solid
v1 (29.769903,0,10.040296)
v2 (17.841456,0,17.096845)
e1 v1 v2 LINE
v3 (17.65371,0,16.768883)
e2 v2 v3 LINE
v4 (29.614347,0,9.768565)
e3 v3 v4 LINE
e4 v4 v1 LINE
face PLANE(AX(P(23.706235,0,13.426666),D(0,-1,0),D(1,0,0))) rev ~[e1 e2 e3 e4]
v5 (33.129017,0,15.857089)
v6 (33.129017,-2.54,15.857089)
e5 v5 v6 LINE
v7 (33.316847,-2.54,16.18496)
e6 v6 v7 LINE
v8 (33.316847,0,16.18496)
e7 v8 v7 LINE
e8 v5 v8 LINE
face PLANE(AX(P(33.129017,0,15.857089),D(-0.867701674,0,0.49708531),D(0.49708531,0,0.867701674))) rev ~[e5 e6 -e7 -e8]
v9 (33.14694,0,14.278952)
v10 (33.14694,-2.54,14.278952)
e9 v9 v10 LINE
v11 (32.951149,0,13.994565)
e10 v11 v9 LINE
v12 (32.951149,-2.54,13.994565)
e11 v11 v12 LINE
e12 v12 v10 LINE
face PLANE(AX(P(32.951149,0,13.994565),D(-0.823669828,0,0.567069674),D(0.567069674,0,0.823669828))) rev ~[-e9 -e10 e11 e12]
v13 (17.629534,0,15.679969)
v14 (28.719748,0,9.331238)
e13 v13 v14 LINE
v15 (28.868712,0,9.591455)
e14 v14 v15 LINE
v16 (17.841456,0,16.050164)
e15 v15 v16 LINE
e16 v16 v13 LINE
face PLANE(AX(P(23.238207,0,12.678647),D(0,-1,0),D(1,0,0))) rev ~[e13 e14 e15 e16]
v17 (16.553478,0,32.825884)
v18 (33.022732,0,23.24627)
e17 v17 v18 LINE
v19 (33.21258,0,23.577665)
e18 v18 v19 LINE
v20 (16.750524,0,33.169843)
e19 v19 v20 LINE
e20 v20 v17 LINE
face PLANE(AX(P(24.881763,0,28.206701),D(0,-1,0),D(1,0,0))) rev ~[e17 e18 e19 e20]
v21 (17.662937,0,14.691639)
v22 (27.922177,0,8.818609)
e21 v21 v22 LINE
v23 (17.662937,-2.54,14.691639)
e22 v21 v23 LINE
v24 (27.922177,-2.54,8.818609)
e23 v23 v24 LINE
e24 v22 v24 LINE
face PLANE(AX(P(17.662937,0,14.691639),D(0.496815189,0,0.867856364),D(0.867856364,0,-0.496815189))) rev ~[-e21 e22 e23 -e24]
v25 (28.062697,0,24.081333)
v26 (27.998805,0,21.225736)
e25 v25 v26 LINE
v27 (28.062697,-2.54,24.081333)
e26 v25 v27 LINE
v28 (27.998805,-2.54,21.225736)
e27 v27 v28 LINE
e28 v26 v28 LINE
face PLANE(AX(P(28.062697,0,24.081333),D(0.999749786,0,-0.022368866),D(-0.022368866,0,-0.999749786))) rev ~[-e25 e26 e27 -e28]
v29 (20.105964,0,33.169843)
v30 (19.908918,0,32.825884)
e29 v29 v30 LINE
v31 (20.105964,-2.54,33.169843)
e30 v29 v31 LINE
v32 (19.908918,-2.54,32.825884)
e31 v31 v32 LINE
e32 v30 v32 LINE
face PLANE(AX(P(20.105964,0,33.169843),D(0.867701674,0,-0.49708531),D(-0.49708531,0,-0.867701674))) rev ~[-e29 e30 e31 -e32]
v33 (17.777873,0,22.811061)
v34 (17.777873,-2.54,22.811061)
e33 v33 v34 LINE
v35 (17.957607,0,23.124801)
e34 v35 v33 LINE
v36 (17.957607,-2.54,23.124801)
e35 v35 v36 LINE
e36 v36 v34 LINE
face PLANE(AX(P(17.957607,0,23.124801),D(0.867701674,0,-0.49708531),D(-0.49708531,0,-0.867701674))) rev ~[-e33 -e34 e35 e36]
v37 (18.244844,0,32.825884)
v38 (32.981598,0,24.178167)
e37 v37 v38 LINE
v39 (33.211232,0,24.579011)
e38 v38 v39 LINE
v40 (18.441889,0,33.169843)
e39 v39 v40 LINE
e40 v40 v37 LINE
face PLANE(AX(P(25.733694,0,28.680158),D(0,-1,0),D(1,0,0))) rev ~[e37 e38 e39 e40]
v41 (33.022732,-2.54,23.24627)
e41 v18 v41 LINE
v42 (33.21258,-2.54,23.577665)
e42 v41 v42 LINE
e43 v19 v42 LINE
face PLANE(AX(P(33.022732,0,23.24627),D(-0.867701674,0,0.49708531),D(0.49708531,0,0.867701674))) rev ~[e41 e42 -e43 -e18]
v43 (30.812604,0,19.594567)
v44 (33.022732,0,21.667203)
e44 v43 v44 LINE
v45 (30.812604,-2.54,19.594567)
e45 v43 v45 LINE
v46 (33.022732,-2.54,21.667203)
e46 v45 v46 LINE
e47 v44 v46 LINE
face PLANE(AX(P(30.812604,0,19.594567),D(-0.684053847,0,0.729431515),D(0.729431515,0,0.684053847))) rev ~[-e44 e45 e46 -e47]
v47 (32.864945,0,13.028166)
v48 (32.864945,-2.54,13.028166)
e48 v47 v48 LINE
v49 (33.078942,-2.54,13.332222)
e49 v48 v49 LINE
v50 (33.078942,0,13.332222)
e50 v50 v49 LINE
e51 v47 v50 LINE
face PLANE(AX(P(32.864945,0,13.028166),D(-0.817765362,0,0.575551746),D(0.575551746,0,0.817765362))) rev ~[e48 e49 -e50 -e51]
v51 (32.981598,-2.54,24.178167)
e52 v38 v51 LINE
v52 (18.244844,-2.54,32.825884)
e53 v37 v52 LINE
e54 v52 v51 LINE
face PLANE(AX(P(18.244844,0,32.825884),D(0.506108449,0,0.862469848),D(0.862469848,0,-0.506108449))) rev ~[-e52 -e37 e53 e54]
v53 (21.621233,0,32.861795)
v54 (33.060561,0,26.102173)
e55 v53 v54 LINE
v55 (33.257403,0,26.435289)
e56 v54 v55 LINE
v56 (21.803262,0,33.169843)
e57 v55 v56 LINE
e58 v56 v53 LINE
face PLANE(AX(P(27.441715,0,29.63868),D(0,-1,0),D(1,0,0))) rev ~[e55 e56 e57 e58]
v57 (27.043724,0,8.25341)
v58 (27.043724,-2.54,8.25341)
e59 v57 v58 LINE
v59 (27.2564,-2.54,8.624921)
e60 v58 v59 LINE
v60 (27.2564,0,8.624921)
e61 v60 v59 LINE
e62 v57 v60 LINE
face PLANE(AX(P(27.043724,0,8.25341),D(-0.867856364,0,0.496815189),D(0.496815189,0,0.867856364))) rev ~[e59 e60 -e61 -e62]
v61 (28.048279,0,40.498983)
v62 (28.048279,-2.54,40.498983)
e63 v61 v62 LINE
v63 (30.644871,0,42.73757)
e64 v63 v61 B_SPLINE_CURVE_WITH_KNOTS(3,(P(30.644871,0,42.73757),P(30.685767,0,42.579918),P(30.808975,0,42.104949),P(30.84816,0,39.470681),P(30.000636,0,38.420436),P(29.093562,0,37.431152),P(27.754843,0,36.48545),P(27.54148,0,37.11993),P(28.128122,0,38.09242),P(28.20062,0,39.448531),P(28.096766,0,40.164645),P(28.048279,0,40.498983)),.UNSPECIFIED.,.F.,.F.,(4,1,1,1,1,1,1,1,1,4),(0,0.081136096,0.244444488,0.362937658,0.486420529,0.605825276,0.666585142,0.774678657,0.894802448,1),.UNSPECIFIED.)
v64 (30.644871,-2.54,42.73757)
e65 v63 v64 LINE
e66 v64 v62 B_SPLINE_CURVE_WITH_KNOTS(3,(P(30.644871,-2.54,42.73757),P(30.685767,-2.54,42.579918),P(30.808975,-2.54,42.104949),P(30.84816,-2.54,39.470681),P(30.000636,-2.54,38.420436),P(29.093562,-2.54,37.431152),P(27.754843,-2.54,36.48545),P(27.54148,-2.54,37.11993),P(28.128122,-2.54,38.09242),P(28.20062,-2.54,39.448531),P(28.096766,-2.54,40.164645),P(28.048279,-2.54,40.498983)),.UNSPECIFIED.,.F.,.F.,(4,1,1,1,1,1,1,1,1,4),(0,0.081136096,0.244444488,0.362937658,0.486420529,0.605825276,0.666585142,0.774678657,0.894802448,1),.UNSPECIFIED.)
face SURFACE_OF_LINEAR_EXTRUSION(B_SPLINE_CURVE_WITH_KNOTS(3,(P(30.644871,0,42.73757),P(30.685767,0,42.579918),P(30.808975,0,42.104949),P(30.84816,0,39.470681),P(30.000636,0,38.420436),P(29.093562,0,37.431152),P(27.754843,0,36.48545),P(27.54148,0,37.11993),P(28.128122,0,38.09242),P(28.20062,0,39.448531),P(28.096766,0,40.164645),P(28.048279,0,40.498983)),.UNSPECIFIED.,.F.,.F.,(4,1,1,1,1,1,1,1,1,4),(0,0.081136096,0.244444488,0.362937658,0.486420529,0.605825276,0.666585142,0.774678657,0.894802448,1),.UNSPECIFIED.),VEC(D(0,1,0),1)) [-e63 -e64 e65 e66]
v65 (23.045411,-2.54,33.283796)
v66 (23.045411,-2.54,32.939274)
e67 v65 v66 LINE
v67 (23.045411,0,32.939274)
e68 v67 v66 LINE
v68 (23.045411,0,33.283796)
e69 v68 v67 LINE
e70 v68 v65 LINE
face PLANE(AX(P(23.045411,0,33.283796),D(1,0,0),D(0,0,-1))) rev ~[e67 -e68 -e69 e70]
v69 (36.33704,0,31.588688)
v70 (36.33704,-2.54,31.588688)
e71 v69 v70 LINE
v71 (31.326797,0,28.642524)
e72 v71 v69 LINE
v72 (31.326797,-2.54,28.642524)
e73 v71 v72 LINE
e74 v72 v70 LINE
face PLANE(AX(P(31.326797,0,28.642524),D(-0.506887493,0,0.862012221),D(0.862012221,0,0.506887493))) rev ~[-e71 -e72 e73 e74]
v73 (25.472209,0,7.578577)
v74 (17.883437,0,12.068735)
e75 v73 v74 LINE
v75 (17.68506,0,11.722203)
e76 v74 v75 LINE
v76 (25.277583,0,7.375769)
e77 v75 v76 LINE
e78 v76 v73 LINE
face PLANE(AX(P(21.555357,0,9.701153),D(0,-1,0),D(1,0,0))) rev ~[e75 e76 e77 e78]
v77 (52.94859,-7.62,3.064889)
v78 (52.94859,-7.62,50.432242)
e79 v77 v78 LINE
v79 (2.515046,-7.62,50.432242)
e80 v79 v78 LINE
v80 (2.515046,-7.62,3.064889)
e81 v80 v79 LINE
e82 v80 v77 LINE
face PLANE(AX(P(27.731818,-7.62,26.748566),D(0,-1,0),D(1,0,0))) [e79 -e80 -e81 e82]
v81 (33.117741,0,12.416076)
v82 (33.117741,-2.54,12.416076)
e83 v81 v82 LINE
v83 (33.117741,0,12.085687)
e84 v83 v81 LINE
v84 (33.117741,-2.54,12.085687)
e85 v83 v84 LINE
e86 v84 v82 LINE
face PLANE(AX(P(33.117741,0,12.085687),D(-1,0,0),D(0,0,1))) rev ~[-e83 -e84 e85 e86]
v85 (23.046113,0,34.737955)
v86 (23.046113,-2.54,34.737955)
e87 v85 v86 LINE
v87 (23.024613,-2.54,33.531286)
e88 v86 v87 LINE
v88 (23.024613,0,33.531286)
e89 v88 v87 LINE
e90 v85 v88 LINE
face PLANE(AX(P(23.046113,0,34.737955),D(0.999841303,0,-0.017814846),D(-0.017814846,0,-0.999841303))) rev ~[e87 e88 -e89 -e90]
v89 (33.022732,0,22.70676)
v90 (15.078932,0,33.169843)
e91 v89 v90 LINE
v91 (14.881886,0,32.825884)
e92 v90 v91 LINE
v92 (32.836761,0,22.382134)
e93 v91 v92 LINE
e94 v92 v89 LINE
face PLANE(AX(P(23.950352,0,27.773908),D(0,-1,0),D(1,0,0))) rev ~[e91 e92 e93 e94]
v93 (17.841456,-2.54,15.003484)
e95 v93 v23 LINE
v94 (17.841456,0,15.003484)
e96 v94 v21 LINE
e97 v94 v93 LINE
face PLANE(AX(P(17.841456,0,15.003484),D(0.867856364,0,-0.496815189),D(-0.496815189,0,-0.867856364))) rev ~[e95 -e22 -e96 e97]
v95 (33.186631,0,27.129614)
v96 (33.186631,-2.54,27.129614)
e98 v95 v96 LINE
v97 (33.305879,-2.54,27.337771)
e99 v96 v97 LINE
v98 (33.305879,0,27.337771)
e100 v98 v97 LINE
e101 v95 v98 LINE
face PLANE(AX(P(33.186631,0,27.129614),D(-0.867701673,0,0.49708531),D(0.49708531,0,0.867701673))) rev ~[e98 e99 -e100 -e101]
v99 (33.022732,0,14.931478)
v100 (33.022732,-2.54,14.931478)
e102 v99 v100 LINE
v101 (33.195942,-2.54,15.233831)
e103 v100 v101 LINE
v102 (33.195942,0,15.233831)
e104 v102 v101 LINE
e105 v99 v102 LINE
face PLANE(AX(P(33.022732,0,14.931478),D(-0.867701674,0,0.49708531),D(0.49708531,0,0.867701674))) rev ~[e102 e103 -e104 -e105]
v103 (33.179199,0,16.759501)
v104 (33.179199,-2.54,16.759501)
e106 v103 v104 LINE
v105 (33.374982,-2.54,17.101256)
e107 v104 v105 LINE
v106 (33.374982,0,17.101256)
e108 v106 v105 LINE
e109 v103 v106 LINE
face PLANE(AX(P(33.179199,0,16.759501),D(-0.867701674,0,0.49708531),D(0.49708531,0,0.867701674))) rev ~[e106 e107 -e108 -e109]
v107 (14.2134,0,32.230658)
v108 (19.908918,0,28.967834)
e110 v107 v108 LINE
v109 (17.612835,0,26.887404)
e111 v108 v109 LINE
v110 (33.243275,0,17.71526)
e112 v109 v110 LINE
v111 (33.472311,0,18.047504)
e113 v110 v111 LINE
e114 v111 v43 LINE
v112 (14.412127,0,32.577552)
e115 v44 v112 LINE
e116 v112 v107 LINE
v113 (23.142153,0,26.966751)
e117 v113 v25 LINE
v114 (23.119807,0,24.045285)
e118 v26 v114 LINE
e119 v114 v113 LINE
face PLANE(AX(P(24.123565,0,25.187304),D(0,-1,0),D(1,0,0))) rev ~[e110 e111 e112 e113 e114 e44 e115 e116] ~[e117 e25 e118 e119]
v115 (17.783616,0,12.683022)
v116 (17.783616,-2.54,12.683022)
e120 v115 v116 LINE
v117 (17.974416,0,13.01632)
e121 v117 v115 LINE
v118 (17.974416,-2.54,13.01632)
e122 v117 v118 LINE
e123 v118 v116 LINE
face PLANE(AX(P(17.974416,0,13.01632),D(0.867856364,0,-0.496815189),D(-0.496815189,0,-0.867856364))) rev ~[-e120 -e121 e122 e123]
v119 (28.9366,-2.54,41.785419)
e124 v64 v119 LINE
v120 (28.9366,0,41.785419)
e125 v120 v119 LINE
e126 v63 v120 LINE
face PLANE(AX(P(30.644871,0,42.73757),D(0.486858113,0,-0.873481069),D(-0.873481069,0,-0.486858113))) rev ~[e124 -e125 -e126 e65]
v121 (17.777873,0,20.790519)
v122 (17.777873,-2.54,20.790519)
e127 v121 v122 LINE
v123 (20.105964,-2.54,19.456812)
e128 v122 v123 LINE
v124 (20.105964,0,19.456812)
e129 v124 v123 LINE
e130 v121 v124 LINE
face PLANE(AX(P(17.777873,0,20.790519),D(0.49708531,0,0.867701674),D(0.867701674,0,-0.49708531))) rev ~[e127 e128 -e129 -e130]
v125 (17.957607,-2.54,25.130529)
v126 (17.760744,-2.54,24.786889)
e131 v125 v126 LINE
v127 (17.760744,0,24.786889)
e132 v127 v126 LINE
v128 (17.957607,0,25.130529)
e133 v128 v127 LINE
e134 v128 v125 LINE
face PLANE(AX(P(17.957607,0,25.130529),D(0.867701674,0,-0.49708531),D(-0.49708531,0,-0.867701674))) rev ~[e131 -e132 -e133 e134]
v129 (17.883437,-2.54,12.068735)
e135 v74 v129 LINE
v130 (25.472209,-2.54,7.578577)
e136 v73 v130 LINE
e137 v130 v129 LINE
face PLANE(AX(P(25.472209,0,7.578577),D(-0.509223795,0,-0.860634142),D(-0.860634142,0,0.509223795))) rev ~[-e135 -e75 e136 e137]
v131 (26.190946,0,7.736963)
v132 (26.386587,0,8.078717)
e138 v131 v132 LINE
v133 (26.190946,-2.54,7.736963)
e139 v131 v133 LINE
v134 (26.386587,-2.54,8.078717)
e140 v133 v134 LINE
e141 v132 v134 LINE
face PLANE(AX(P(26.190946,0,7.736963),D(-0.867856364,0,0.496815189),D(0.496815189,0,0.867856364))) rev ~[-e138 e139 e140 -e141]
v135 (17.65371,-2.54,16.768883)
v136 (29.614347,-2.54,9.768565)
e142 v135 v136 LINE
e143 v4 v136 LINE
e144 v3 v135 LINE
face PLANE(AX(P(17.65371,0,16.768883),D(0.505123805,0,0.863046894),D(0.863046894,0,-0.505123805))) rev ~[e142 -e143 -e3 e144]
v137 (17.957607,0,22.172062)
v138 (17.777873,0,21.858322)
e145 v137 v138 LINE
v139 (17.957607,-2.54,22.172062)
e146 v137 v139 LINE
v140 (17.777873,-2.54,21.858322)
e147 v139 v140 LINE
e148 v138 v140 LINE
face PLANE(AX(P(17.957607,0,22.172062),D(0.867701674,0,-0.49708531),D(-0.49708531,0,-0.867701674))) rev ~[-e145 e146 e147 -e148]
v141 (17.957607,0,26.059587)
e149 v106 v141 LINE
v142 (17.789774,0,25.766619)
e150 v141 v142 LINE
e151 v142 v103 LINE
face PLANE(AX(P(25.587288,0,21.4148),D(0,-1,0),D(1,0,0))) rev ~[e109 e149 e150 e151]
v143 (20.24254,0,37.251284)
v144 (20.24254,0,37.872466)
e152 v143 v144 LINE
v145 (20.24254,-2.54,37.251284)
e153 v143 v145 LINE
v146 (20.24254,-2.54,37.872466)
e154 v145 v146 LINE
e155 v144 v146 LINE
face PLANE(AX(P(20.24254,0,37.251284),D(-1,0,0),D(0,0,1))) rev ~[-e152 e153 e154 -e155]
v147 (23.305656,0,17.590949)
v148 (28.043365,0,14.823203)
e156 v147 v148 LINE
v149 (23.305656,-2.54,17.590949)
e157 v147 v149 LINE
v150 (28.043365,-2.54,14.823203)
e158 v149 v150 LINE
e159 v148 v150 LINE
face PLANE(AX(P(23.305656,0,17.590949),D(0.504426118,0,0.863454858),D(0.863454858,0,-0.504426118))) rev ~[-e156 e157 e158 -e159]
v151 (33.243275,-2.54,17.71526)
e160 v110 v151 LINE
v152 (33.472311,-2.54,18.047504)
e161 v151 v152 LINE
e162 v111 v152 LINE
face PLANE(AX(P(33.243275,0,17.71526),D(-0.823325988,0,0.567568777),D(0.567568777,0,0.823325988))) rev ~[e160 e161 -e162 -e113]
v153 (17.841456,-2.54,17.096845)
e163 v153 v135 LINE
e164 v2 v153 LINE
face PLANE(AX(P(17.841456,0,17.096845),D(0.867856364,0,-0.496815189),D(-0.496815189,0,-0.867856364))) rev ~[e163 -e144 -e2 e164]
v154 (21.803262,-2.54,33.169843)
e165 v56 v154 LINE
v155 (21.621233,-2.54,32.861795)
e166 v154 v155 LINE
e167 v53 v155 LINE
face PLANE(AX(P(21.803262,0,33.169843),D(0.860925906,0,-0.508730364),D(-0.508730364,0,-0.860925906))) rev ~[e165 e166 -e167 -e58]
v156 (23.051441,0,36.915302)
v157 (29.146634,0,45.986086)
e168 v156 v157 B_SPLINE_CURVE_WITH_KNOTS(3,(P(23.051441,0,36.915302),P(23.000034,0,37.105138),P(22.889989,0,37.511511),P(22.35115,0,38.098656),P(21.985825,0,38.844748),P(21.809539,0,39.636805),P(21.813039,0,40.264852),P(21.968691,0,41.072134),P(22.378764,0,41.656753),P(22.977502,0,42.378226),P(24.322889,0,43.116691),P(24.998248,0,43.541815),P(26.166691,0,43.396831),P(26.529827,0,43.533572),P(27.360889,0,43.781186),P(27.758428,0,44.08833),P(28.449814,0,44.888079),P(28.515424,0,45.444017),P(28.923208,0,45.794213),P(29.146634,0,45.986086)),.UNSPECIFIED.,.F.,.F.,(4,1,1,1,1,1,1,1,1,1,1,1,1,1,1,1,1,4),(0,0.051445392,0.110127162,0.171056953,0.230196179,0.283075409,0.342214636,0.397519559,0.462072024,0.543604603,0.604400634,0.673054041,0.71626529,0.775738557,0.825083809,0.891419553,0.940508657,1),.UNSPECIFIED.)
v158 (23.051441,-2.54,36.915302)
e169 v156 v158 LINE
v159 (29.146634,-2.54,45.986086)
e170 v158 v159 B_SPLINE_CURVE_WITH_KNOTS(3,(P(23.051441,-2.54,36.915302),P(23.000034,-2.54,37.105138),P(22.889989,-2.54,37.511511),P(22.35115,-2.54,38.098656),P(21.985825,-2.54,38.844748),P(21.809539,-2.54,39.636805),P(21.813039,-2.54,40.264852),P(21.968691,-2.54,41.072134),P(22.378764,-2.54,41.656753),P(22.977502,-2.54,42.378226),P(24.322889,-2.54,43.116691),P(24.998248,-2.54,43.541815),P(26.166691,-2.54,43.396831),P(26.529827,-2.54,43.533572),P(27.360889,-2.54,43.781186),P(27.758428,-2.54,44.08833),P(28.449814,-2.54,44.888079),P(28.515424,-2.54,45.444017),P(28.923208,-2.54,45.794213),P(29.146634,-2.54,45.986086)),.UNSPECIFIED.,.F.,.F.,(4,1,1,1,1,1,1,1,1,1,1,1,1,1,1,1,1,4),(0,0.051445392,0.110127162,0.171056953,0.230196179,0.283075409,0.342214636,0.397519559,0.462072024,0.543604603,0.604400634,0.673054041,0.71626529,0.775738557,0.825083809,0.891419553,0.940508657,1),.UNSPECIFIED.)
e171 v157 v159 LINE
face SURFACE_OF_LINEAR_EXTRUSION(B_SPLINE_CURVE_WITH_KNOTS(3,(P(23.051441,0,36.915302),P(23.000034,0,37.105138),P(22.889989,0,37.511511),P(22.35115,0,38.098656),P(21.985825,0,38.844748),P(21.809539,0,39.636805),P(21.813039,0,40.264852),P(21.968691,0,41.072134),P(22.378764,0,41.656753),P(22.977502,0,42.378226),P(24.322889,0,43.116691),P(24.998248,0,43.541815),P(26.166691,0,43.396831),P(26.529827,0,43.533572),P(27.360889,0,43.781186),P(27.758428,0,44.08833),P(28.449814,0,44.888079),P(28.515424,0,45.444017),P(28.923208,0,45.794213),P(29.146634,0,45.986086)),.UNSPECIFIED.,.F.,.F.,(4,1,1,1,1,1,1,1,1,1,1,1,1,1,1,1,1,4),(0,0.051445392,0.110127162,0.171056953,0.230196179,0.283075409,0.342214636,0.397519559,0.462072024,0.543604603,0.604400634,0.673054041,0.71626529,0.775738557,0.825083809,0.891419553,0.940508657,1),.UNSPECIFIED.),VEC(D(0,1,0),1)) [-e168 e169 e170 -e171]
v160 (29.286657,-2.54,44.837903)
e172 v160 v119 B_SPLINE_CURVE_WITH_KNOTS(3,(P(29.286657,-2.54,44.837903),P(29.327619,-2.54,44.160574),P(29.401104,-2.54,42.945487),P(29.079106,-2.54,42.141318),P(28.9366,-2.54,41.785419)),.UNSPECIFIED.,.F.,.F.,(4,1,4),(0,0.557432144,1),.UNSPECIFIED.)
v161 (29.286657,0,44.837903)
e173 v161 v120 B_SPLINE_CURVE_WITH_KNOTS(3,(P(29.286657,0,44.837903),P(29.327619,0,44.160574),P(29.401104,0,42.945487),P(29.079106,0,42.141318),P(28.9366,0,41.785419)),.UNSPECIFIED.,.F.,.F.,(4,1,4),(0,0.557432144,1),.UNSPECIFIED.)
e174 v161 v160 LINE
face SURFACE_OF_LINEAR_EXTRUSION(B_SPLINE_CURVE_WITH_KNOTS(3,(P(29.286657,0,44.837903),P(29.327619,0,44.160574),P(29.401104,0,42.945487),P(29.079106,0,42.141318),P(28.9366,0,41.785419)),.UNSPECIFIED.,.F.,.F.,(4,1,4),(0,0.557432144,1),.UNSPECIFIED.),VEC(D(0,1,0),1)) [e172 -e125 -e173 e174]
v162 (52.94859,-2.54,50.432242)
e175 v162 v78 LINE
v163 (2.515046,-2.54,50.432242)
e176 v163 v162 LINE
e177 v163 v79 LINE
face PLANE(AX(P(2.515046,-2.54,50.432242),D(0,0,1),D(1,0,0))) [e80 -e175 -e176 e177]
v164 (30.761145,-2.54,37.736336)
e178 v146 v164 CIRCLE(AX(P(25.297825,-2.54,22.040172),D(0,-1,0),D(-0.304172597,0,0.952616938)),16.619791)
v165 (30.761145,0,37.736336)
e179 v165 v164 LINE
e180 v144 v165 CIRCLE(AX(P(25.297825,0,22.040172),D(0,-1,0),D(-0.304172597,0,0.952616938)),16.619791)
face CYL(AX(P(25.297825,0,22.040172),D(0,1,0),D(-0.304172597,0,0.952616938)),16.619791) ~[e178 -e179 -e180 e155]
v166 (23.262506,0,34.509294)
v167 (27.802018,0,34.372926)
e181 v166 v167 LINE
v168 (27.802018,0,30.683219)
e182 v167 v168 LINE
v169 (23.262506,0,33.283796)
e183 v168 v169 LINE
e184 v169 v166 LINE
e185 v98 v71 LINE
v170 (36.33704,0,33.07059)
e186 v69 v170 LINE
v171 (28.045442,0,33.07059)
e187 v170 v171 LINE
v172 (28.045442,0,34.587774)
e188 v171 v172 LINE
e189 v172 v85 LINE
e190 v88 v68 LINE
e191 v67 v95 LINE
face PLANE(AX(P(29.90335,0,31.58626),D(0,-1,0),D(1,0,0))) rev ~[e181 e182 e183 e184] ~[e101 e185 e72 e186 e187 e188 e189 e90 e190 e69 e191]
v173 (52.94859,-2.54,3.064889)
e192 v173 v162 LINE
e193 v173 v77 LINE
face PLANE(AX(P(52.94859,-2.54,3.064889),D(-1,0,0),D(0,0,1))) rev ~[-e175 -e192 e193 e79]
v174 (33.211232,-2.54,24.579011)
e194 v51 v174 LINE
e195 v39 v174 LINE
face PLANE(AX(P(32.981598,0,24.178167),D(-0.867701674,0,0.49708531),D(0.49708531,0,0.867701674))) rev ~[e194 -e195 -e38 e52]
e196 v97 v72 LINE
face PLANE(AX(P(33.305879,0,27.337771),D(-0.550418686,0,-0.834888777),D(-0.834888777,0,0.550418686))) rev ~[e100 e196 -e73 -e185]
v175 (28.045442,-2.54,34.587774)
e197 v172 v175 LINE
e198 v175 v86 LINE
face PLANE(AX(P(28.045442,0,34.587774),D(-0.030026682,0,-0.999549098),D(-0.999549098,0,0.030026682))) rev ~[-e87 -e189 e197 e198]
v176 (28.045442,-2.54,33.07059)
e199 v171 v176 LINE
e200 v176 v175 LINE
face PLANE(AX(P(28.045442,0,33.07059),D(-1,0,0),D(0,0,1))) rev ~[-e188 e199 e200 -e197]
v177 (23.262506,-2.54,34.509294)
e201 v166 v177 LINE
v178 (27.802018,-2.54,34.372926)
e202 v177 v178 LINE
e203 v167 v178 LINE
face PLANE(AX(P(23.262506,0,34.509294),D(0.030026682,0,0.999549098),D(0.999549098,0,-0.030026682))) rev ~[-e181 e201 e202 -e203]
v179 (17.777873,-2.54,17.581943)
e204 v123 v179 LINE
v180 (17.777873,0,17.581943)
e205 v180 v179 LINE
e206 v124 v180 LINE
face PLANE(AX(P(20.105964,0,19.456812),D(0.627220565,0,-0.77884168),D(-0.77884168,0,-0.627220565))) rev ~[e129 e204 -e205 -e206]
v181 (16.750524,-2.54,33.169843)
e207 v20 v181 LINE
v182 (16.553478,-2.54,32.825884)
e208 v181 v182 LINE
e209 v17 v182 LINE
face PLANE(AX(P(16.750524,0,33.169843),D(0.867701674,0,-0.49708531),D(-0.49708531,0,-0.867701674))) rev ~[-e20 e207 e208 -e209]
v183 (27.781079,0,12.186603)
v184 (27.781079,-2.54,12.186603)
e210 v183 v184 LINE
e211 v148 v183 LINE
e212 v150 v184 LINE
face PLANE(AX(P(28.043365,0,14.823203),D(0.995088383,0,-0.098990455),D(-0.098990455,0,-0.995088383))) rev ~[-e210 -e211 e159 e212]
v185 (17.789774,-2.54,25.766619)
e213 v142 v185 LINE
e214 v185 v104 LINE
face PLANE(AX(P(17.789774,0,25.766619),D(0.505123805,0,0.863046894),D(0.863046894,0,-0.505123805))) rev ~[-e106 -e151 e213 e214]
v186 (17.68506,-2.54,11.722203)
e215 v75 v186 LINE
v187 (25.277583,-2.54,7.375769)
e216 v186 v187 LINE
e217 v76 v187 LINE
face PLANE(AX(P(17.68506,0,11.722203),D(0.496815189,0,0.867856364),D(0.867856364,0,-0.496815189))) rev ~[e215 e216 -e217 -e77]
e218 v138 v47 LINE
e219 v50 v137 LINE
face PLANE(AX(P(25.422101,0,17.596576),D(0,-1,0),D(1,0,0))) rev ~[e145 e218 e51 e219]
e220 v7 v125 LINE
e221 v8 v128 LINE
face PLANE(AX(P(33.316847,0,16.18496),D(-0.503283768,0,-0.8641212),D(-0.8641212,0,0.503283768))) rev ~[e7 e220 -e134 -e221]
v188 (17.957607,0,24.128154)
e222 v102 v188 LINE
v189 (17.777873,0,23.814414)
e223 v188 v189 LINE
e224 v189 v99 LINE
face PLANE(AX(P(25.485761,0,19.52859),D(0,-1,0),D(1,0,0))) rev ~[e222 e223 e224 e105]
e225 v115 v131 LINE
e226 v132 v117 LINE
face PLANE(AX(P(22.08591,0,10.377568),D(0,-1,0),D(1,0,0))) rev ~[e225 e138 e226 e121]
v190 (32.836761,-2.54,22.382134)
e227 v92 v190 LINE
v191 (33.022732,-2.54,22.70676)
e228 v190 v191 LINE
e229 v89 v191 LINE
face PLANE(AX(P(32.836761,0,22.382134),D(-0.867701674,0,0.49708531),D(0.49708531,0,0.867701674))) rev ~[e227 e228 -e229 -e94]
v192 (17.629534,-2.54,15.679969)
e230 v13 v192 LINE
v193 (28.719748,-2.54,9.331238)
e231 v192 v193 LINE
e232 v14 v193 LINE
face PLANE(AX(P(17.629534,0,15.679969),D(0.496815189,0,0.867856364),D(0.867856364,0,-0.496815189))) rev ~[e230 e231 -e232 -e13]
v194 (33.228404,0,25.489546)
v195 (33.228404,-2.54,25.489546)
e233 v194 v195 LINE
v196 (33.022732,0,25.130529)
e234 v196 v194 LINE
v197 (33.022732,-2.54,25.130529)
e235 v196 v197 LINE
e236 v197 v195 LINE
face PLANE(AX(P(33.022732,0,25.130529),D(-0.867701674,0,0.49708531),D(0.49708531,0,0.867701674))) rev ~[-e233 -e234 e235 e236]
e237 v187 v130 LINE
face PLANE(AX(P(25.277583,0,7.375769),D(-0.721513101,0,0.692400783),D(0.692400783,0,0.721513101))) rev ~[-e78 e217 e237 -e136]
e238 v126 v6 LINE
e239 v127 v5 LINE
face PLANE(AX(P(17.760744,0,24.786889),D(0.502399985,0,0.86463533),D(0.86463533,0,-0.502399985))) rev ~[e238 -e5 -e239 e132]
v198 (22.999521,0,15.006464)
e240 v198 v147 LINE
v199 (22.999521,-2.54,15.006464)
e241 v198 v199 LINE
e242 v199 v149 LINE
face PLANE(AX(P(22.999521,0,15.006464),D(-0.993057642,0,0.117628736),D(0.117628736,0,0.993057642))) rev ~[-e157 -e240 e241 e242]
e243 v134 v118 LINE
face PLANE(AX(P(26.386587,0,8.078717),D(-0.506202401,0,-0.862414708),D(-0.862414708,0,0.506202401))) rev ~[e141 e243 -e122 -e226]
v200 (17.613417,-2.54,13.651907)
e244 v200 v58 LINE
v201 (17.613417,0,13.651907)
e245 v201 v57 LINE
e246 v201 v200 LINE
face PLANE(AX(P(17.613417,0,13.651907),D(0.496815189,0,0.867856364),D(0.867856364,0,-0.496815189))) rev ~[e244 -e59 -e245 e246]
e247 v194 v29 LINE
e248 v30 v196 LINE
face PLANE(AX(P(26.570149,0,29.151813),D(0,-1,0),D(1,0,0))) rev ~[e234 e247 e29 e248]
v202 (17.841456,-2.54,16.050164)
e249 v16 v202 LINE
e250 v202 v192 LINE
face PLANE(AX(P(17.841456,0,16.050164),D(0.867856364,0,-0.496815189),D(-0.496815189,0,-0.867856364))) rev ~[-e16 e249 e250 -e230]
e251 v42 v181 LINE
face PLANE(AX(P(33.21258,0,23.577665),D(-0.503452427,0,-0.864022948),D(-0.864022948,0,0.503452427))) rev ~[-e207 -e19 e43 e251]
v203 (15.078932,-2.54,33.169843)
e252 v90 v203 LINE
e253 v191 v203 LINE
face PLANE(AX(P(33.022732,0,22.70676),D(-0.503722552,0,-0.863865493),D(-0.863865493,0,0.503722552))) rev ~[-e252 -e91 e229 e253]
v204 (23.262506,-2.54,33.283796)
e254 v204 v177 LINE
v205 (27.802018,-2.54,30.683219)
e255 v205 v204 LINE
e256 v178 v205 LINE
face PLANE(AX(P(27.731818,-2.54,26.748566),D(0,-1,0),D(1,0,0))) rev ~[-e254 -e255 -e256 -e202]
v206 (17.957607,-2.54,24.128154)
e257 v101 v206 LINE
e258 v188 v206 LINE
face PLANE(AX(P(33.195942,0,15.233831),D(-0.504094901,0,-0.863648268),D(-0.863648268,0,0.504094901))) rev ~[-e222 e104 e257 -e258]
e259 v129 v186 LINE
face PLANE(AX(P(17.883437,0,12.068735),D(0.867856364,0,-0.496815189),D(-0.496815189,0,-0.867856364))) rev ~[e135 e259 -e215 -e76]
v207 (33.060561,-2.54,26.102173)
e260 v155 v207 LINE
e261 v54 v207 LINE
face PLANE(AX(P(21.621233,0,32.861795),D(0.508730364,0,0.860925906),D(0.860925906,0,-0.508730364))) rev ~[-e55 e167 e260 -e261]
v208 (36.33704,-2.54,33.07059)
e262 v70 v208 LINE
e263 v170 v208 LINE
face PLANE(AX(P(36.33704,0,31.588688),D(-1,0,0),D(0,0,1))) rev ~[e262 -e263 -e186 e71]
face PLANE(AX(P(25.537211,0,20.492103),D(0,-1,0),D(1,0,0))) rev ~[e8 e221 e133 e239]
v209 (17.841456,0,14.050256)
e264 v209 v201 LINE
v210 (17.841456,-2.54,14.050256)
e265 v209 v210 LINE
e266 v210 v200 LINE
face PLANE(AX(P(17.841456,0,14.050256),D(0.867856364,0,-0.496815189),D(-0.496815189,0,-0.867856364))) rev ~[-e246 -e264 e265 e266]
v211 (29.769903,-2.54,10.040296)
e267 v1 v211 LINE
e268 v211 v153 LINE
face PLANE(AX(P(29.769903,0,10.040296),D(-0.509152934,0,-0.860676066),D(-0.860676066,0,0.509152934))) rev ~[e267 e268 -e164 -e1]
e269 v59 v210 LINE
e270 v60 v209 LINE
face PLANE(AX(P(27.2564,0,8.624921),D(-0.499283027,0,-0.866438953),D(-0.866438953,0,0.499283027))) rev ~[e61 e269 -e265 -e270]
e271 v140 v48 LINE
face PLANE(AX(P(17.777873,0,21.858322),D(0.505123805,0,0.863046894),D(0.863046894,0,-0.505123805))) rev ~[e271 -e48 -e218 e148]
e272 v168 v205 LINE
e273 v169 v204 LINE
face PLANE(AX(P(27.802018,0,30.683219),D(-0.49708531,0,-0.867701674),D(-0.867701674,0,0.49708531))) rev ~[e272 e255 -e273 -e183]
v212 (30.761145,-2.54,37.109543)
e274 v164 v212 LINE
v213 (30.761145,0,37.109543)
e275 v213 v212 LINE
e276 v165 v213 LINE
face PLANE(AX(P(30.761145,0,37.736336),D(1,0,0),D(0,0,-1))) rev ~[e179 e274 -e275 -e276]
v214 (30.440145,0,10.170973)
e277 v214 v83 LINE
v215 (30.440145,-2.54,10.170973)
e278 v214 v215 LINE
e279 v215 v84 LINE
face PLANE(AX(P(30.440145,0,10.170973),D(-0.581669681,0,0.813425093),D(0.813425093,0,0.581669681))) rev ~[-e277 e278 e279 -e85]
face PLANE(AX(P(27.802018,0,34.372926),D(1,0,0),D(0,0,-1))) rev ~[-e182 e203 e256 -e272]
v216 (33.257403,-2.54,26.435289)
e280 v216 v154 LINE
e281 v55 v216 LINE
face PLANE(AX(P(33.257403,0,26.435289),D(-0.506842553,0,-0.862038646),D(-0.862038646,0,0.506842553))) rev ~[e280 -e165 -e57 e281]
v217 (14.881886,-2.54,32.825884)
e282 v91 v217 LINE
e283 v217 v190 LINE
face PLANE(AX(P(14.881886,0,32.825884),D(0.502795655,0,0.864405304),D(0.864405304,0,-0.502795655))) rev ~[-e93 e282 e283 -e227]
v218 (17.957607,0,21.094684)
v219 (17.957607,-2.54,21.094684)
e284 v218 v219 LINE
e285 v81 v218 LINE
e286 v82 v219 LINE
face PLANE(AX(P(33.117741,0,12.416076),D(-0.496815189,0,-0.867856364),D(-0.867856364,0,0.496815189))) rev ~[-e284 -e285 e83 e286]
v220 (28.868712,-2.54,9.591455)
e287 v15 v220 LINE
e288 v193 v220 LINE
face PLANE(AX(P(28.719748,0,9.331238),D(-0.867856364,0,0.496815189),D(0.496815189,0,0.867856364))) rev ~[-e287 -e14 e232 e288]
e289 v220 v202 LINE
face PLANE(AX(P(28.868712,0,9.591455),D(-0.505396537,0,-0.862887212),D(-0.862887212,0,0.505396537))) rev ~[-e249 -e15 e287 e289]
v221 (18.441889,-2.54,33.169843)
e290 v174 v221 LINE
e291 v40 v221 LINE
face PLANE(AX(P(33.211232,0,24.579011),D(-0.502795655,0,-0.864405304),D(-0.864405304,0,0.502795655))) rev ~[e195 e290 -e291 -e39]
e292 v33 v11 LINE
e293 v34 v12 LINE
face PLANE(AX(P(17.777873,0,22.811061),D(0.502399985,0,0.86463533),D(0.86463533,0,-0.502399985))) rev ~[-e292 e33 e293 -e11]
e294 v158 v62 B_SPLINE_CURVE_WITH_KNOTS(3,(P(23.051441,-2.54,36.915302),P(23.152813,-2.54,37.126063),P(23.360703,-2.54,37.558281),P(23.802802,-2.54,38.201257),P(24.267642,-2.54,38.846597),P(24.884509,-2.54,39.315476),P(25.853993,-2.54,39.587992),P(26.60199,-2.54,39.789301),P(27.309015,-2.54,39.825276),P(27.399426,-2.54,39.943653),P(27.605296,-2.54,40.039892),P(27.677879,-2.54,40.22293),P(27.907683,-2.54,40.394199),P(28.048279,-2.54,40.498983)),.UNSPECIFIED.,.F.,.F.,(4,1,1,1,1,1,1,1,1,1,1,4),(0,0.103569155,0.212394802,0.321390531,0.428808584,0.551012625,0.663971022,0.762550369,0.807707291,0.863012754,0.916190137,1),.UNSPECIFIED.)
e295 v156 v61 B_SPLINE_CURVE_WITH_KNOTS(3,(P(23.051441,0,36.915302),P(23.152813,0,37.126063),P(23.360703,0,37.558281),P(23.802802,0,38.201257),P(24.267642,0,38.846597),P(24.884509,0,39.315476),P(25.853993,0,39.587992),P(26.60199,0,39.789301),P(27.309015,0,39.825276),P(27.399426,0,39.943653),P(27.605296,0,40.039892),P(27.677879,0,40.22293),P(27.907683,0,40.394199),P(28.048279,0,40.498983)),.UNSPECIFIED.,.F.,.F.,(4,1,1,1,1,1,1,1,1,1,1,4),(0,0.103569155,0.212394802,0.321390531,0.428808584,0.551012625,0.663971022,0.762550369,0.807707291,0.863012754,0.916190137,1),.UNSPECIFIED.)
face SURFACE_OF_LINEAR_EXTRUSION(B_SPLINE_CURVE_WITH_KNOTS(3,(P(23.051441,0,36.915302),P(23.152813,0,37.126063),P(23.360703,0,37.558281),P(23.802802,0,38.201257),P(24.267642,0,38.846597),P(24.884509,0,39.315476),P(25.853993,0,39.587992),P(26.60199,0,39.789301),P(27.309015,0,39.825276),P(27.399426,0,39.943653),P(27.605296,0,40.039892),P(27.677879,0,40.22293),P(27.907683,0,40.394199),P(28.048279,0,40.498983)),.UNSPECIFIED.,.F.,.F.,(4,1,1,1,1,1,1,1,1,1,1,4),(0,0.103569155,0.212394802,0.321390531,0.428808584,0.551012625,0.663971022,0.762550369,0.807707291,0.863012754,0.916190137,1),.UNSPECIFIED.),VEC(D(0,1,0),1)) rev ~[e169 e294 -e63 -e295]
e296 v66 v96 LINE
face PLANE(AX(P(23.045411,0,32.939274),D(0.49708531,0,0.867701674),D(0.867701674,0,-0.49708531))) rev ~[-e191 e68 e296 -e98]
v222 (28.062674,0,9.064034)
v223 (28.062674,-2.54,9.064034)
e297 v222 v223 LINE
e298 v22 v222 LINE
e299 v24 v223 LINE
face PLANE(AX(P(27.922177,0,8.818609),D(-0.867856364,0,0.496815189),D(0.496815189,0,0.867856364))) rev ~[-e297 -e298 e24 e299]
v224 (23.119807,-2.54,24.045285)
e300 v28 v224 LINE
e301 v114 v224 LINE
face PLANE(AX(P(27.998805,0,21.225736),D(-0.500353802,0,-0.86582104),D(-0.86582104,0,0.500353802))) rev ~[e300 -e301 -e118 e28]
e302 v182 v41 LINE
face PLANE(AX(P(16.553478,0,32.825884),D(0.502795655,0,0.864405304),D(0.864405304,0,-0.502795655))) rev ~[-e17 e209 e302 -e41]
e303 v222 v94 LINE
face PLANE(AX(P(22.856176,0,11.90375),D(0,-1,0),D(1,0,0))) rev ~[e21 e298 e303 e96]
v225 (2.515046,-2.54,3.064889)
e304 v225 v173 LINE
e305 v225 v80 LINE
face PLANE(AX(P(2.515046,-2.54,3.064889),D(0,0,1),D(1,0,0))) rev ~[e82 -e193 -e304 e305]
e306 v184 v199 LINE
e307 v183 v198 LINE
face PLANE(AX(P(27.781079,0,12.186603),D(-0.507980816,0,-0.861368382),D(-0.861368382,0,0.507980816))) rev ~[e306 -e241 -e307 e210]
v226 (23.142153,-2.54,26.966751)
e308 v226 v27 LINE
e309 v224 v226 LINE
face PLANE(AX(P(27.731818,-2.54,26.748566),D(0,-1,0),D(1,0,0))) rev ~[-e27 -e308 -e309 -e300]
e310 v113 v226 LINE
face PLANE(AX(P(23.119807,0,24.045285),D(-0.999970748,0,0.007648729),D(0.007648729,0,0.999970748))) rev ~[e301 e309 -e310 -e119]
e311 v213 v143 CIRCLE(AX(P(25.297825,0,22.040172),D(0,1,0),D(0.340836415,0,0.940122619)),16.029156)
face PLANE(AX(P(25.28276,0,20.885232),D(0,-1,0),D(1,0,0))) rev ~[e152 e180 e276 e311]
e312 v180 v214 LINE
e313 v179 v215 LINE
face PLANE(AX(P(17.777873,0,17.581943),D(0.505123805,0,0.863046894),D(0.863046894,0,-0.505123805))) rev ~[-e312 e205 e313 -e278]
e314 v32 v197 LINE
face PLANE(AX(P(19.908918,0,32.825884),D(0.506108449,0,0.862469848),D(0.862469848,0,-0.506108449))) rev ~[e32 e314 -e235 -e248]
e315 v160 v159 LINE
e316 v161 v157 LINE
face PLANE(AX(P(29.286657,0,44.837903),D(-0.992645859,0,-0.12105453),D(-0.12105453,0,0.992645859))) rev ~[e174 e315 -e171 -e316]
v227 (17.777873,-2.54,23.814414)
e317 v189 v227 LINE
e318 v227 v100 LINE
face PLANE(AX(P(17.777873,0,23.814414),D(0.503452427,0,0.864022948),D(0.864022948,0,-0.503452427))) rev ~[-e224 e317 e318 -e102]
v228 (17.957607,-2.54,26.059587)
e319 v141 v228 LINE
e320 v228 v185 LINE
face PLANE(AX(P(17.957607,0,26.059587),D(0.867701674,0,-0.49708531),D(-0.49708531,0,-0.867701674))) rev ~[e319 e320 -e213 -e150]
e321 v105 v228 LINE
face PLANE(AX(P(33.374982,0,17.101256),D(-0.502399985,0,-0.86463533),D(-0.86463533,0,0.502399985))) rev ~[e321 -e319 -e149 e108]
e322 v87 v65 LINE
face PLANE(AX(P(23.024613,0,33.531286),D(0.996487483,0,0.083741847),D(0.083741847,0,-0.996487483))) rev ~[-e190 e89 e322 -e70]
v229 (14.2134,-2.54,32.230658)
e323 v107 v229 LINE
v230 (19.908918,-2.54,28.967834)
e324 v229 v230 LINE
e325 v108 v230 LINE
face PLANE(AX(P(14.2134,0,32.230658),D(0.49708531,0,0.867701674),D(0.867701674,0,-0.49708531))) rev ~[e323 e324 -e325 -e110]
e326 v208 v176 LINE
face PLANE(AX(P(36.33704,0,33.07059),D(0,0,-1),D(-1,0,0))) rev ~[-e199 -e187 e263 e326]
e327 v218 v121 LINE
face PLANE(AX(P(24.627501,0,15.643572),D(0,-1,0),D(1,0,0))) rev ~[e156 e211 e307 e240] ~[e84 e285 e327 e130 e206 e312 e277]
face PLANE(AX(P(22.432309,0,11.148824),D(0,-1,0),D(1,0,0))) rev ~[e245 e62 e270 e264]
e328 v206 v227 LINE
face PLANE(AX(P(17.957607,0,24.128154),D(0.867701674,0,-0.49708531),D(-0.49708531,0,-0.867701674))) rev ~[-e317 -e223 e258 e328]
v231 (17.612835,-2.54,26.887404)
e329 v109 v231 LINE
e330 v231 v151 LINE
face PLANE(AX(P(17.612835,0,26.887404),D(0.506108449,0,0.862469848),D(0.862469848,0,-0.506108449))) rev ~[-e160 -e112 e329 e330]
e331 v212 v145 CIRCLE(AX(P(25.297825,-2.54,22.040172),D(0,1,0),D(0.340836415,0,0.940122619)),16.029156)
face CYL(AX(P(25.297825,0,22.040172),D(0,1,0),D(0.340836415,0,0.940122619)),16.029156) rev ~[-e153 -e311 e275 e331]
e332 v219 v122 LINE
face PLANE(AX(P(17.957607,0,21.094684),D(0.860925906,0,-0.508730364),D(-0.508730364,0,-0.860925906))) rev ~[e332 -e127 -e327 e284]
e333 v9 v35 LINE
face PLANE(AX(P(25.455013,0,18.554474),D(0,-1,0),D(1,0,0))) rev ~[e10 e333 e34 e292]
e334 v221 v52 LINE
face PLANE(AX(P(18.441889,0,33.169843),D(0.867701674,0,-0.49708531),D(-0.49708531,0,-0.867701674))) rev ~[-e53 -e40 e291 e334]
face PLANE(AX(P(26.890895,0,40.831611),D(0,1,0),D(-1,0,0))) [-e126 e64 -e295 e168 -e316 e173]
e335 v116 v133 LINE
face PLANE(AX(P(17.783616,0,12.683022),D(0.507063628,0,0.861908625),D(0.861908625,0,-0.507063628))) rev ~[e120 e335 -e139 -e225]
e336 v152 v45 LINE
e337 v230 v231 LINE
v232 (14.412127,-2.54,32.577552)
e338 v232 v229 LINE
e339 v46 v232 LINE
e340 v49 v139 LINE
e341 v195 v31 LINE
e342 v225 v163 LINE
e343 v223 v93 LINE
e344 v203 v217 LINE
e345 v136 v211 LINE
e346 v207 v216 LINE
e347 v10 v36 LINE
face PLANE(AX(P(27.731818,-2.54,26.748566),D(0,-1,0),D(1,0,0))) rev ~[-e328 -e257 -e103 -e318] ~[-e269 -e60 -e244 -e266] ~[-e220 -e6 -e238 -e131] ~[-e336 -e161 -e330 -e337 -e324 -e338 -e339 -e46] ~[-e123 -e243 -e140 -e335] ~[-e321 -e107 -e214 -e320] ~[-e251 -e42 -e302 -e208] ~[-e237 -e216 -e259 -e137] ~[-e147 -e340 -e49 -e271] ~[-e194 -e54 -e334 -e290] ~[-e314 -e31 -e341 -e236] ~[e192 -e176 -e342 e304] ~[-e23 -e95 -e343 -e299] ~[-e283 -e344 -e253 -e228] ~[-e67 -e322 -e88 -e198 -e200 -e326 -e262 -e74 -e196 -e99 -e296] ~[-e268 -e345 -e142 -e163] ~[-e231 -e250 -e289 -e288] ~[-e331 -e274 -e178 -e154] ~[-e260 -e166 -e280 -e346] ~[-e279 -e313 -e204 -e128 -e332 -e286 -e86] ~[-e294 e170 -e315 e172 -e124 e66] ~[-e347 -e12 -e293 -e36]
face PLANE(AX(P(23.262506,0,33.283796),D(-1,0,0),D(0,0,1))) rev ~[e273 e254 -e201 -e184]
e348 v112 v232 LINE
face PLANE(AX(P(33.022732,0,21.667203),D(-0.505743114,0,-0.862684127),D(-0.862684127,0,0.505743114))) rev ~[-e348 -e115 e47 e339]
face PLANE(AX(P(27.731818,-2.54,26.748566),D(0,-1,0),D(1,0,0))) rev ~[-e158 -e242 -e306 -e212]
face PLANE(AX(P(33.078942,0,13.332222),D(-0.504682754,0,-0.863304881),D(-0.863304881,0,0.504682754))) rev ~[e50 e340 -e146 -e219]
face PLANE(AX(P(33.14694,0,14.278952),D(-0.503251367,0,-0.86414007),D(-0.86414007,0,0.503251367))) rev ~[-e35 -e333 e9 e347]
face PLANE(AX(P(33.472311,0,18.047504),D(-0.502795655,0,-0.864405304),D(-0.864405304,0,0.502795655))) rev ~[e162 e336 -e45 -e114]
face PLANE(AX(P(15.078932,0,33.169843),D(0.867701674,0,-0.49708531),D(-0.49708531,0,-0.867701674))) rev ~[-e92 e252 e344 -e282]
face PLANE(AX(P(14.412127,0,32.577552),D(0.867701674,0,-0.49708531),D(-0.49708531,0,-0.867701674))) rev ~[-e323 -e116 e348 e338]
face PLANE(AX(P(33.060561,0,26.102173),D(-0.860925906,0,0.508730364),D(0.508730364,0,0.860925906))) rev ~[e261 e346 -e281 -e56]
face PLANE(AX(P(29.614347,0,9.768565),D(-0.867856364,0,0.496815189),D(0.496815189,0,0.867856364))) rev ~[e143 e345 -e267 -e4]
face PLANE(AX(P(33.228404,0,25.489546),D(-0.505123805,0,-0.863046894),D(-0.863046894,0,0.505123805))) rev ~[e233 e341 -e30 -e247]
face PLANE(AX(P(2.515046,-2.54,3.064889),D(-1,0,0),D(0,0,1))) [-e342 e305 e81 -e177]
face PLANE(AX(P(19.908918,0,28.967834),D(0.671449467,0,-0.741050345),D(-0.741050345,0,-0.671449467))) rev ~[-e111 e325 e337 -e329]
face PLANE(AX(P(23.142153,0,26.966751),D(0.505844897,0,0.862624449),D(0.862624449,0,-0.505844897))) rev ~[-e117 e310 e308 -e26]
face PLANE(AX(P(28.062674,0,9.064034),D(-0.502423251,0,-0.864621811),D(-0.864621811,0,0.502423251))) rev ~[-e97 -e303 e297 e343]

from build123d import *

# Parameters (mm, degrees)
F1_DEPTH = 2.54
F2_W     = 50.4335446749
F2_H     = 47.3673532251
F3_DEPTH = 5.08


# Not quite as in the source:
# - a feature names something its author has since deleted; it is built from what else it names


with BuildPart() as f1:
    # F0 (on Front) → F1 (new body)
    with BuildSketch(Plane.XZ):
        with BuildLine():
            Line((20.2425401959, 37.2512835941), (20.2425401959, 37.8724660293))
            ThreePointArc((20.2425401959, 37.8724660293), (25.0827531799, 5.42177238), (30.7611451277, 37.7363363557))
            Line((30.7611451277, 37.7363363557), (30.7611451277, 37.1095434926))
            ThreePointArc((30.7611451277, 37.1095434926), (25.0818490069, 6.0124710706), (20.2425401959, 37.2512835941))
        make_face()
    extrude(amount=F1_DEPTH)



with BuildPart() as f1b:
    # F0 (on Front) → F1, piece 2 (new body)
    with BuildSketch(Plane.XZ):
        with BuildLine():
            add(Edge.make_bspline(
                [(23.0514407158, 36.9153022766), (23.0000338532, 37.1051377654), (22.8899891699, 37.5115112571), (22.3511496369, 38.0986562322), (21.9858249437, 38.8447480675), (21.809539247, 39.6368045254), (21.813039047, 40.2648522584), (21.9686906382, 41.0721339012), (22.3787637159, 41.6567525791), (22.9775021785, 42.3782255437), (24.3228887053, 43.1166905037), (24.9982483073, 43.5418154349), (26.1666914194, 43.3968309792), (26.5298273051, 43.5335722369), (27.3608892448, 43.7811862144), (27.7584279708, 44.0883300962), (28.4498141772, 44.888079071), (28.5154236724, 45.4440168979), (28.92320837, 45.7942132009), (29.1466340423, 45.9860861301)],
                knots=[0, 0, 0, 0, 0.0514453921, 0.110127162, 0.171056953, 0.2301961795, 0.2830754093, 0.3422146359, 0.3975195588, 0.462072024, 0.5436046033, 0.6044006336, 0.6730540413, 0.7162652895, 0.7757385566, 0.8250838091, 0.8914195533, 0.940508657, 1, 1, 1, 1], degree=3))
            add(Edge.make_bspline(
                [(23.0514407158, 36.9153022766), (23.1528130098, 37.1260630271), (23.3607025921, 37.5582813649), (23.8028016121, 38.2012565529), (24.2676415464, 38.8465973471), (24.884509448, 39.3154758933), (25.8539932072, 39.587992103), (26.6019896914, 39.789301054), (27.3090151116, 39.8252756175), (27.3994263447, 39.9436529244), (27.6052961291, 40.0398924739), (27.6778788081, 40.2229303085), (27.9076828587, 40.3941993708), (28.0482787639, 40.498983115)],
                knots=[0, 0, 0, 0, 0.1035691547, 0.2123948021, 0.3213905308, 0.4288085843, 0.5510126252, 0.6639710224, 0.7625503685, 0.8077072913, 0.8630127537, 0.9161901374, 1, 1, 1, 1], degree=3))
            add(Edge.make_bspline(
                [(30.6448712945, 42.7375696599), (30.6857665771, 42.5799177306), (30.8089747033, 42.1049485515), (30.8481597012, 39.4706811929), (30.0006358069, 38.420435968), (29.0935620801, 37.4311516729), (27.7548428286, 36.4854500621), (27.5414798642, 37.1199299693), (28.1281216554, 38.0924200775), (28.2006198304, 39.4485309647), (28.0967658775, 40.1646452117), (28.0482787639, 40.498983115)],
                knots=[0, 0, 0, 0, 0.0811360963, 0.2444444876, 0.3629376576, 0.4864205288, 0.6058252757, 0.6665851424, 0.7746786569, 0.8948024484, 1, 1, 1, 1], degree=3))
            Line((30.6448712945, 42.7375696599), (28.9366003126, 41.7854189873))
            add(Edge.make_bspline(
                [(29.2866565287, 44.8379032314), (29.3276194284, 44.1605744561), (29.401104426, 42.9454870543), (29.0791063228, 42.1413182507), (28.9366003126, 41.7854189873)],
                knots=[0, 0, 0, 0, 0.5574321438, 1, 1, 1, 1], degree=3))
            Line((29.2866565287, 44.8379032314), (29.1466340423, 45.9860861301))
        make_face()
    extrude(amount=F1_DEPTH)


with BuildPart() as f1c:
    # F0 (on Front) → F1, piece 3 (new body)
    with BuildSketch(Plane.XZ):
        Polygon((33.2574028222, 26.435288895), (21.8032617122, 33.1698432565), (21.6212328523, 32.8617952764), (33.0605612282, 26.1021732809), align=None)
    extrude(amount=F1_DEPTH)


with BuildPart() as f1d:
    # F0 (on Front) → F1, piece 4 (new body)
    with BuildSketch(Plane.XZ):
        Polygon((33.228403627, 25.4895458259), (20.1059635729, 33.1698432565), (19.9089177924, 32.8258842821), (33.0227315426, 25.1305289567), align=None)
    extrude(amount=F1_DEPTH)


with BuildPart() as f1e:
    # F0 (on Front) → F1, piece 5 (new body)
    with BuildSketch(Plane.XZ):
        Polygon((33.2112317713, 24.5790107882), (18.4418894351, 33.1698432565), (18.2448436546, 32.8258842821), (32.9815978057, 24.1781665627), align=None)
    extrude(amount=F1_DEPTH)


with BuildPart() as f1f:
    # F0 (on Front) → F1, piece 6 (new body)
    with BuildSketch(Plane.XZ):
        Polygon((33.2125796453, 23.5776652022), (16.7505238205, 33.1698432565), (16.55347804, 32.8258842821), (33.0227315426, 23.2462703429), align=None)
    extrude(amount=F1_DEPTH)


with BuildPart() as f1g:
    # F0 (on Front) → F1, piece 7 (new body)
    with BuildSketch(Plane.XZ):
        Polygon((33.0227315426, 22.7067601114), (15.0789320469, 33.1698432565), (14.8818862664, 32.8258842821), (32.8367611378, 22.3821340801), align=None)
    extrude(amount=F1_DEPTH)


with BuildPart() as f1h:
    # F0 (on Front) → F1, piece 8 (new body)
    with BuildSketch(Plane.XZ):
        Polygon((33.3749822633, 17.101256154), (17.9576072842, 26.0595865548), (17.7897735171, 25.7666194572), (33.1791992282, 16.7595014014), align=None)
    extrude(amount=F1_DEPTH)


with BuildPart() as f1i:
    # F0 (on Front) → F1, piece 9 (new body)
    with BuildSketch(Plane.XZ):
        Polygon((33.3168466854, 16.1849598837), (17.9576072842, 25.1305289567), (17.76074414, 24.7868887884), (33.1290174507, 15.857089118), align=None)
    extrude(amount=F1_DEPTH)


with BuildPart() as f1j:
    # F0 (on Front) → F1, piece 10 (new body)
    with BuildSketch(Plane.XZ):
        Polygon((33.195942283, 15.2338305576), (17.9576072842, 24.1281539202), (17.7778732402, 23.8144139492), (33.0227315426, 14.9314775283), align=None)
    extrude(amount=F1_DEPTH)


with BuildPart() as f1k:
    # F0 (on Front) → F1, piece 11 (new body)
    with BuildSketch(Plane.XZ):
        Polygon((33.1469401717, 14.2789520323), (17.9576072842, 23.124800995), (17.7778732402, 22.811061024), (32.9511492616, 13.9945653465), align=None)
    extrude(amount=F1_DEPTH)


with BuildPart() as f1l:
    # F0 (on Front) → F1, piece 12 (new body)
    with BuildSketch(Plane.XZ):
        Polygon((33.0789424479, 13.332221657), (17.9576072842, 22.1720617265), (17.7778732402, 21.8583217555), (32.8649446067, 13.0281655517), align=None)
    extrude(amount=F1_DEPTH)


with BuildPart() as f1m:
    # F0 (on Front) → F1, piece 13 (new body)
    with BuildSketch(Plane.XZ):
        Polygon((29.7699026556, 10.0402957994), (17.841456458, 17.0968454331), (17.6537100383, 16.7688825837), (29.6143469321, 9.7685649275), align=None)
    extrude(amount=F1_DEPTH)


with BuildPart() as f1n:
    # F0 (on Front) → F1, piece 14 (new body)
    with BuildSketch(Plane.XZ):
        Polygon((28.8687120376, 9.5914553699), (17.841456458, 16.0501636565), (17.62953414, 15.6799693944), (28.7197476416, 9.3312384888), align=None)
    extrude(amount=F1_DEPTH)


with BuildPart() as f1o:
    # F0 (on Front) → F1, piece 15 (new body)
    with BuildSketch(Plane.XZ):
        Polygon((28.0626742242, 9.0640343876), (17.841456458, 15.0034837425), (17.6629371227, 14.6916391278), (27.9221774879, 8.8186091482), align=None)
    extrude(amount=F1_DEPTH)


with BuildPart() as f1p:
    # F0 (on Front) → F1, piece 16 (new body)
    with BuildSketch(Plane.XZ):
        Polygon((27.2564003965, 8.6249213116), (17.841456458, 14.0502564609), (17.6134166067, 13.6519074561), (27.0437242973, 8.2534103148), align=None)
    extrude(amount=F1_DEPTH)


with BuildPart() as f1q:
    # F0 (on Front) → F1, piece 17 (new body)
    with BuildSketch(Plane.XZ):
        Polygon((26.3865872887, 8.0787168843), (17.974415794, 13.0163198337), (17.7836155065, 12.6830223674), (26.1909458786, 7.7369627543), align=None)
    extrude(amount=F1_DEPTH)


with BuildPart() as f1r:
    # F0 (on Front) → F1, piece 18 (new body)
    with BuildSketch(Plane.XZ):
        Polygon((25.4722088575, 7.5785773806), (17.8834367543, 12.0687354356), (17.6850601811, 11.7222034147), (25.2775834555, 7.3757688617), align=None)
    extrude(amount=F1_DEPTH)


with BuildPart() as f1s:
    # F0 (on Front) → F1, piece 19 (new body)
    with BuildSketch(Plane.XZ):
        Polygon((33.1177413464, 12.4160759151), (17.9576072842, 21.0946835577), (17.7778732402, 20.7905191013), (20.1059635729, 19.4568124362), (17.7778732402, 17.5819434226), (30.4401450117, 10.1709731341), (33.1177413464, 12.0856873691), align=None)
        Polygon((22.9995213449, 15.0064639747), (23.3056563884, 17.5909493119), (28.043365106, 14.8232029751), (27.7810785919, 12.1866026893), align=None, mode=Mode.SUBTRACT)
    extrude(amount=F1_DEPTH)


with BuildPart() as f1t:
    # F0 (on Front) → F1, piece 20 (new body)
    with BuildSketch(Plane.XZ):
        Polygon((33.0227315426, 21.6672029346), (14.4121274352, 32.5775519013), (14.2134002971, 32.2306579844), (19.9089177924, 28.9678337124), (17.6128353924, 26.8874038011), (33.2432746912, 17.7152600915), (33.4723107517, 18.047504127), (30.8126039797, 19.594566601), align=None)
        Polygon((23.1198072433, 24.0452848375), (23.1421533972, 26.9667506218), (28.0626975, 24.0813326091), (27.9988050461, 21.2257355452), align=None, mode=Mode.SUBTRACT)
    extrude(amount=F1_DEPTH)


with BuildPart() as f1u:
    # F0 (on Front) → F1, piece 21 (new body)
    with BuildSketch(Plane.XZ):
        Polygon((23.0246130377, 33.5312858224), (23.0454113334, 33.2837961614), (23.0454113334, 32.939273864), (33.1866306884, 27.1296144809), (33.3058785922, 27.3377711162), (31.3267968595, 28.6425240338), (36.3370403647, 31.5886884928), (36.3370403647, 33.0705903471), (28.0454419553, 33.0705903471), (28.0454419553, 34.5877744257), (23.0461130826, 34.737955403), align=None)
        Polygon((23.2625063509, 33.2837961614), (23.2625063509, 33.5312858224), (23.2625063509, 34.509293735), (27.8020184487, 34.3729257584), (27.8020184487, 30.6832194328), align=None, mode=Mode.SUBTRACT)
    extrude(amount=F1_DEPTH)


with BuildPart() as f1_1:
    add(f1.part)

    add(f1b.part)  # F3 merges F1b

    add(f1c.part)  # F3 merges F1c

    add(f1d.part)  # F3 merges F1d

    add(f1e.part)  # F3 merges F1e

    add(f1f.part)  # F3 merges F1f

    add(f1g.part)  # F3 merges F1g

    add(f1h.part)  # F3 merges F1h

    add(f1i.part)  # F3 merges F1i

    add(f1j.part)  # F3 merges F1j

    add(f1k.part)  # F3 merges F1k

    add(f1l.part)  # F3 merges F1l

    add(f1m.part)  # F3 merges F1m

    add(f1n.part)  # F3 merges F1n

    add(f1o.part)  # F3 merges F1o

    add(f1p.part)  # F3 merges F1p

    add(f1q.part)  # F3 merges F1q

    add(f1r.part)  # F3 merges F1r

    add(f1s.part)  # F3 merges F1s

    add(f1t.part)  # F3 merges F1t

    add(f1u.part)  # F3 merges F1u
    # F2 (on face) → F3 (join)
    with BuildSketch(Plane.XZ.offset(2.54)):
        with Locations((27.7318180306, 26.7485658405)):
            Rectangle(F2_W, F2_H)
    extrude(amount=F3_DEPTH)


solid = f1_1.part
